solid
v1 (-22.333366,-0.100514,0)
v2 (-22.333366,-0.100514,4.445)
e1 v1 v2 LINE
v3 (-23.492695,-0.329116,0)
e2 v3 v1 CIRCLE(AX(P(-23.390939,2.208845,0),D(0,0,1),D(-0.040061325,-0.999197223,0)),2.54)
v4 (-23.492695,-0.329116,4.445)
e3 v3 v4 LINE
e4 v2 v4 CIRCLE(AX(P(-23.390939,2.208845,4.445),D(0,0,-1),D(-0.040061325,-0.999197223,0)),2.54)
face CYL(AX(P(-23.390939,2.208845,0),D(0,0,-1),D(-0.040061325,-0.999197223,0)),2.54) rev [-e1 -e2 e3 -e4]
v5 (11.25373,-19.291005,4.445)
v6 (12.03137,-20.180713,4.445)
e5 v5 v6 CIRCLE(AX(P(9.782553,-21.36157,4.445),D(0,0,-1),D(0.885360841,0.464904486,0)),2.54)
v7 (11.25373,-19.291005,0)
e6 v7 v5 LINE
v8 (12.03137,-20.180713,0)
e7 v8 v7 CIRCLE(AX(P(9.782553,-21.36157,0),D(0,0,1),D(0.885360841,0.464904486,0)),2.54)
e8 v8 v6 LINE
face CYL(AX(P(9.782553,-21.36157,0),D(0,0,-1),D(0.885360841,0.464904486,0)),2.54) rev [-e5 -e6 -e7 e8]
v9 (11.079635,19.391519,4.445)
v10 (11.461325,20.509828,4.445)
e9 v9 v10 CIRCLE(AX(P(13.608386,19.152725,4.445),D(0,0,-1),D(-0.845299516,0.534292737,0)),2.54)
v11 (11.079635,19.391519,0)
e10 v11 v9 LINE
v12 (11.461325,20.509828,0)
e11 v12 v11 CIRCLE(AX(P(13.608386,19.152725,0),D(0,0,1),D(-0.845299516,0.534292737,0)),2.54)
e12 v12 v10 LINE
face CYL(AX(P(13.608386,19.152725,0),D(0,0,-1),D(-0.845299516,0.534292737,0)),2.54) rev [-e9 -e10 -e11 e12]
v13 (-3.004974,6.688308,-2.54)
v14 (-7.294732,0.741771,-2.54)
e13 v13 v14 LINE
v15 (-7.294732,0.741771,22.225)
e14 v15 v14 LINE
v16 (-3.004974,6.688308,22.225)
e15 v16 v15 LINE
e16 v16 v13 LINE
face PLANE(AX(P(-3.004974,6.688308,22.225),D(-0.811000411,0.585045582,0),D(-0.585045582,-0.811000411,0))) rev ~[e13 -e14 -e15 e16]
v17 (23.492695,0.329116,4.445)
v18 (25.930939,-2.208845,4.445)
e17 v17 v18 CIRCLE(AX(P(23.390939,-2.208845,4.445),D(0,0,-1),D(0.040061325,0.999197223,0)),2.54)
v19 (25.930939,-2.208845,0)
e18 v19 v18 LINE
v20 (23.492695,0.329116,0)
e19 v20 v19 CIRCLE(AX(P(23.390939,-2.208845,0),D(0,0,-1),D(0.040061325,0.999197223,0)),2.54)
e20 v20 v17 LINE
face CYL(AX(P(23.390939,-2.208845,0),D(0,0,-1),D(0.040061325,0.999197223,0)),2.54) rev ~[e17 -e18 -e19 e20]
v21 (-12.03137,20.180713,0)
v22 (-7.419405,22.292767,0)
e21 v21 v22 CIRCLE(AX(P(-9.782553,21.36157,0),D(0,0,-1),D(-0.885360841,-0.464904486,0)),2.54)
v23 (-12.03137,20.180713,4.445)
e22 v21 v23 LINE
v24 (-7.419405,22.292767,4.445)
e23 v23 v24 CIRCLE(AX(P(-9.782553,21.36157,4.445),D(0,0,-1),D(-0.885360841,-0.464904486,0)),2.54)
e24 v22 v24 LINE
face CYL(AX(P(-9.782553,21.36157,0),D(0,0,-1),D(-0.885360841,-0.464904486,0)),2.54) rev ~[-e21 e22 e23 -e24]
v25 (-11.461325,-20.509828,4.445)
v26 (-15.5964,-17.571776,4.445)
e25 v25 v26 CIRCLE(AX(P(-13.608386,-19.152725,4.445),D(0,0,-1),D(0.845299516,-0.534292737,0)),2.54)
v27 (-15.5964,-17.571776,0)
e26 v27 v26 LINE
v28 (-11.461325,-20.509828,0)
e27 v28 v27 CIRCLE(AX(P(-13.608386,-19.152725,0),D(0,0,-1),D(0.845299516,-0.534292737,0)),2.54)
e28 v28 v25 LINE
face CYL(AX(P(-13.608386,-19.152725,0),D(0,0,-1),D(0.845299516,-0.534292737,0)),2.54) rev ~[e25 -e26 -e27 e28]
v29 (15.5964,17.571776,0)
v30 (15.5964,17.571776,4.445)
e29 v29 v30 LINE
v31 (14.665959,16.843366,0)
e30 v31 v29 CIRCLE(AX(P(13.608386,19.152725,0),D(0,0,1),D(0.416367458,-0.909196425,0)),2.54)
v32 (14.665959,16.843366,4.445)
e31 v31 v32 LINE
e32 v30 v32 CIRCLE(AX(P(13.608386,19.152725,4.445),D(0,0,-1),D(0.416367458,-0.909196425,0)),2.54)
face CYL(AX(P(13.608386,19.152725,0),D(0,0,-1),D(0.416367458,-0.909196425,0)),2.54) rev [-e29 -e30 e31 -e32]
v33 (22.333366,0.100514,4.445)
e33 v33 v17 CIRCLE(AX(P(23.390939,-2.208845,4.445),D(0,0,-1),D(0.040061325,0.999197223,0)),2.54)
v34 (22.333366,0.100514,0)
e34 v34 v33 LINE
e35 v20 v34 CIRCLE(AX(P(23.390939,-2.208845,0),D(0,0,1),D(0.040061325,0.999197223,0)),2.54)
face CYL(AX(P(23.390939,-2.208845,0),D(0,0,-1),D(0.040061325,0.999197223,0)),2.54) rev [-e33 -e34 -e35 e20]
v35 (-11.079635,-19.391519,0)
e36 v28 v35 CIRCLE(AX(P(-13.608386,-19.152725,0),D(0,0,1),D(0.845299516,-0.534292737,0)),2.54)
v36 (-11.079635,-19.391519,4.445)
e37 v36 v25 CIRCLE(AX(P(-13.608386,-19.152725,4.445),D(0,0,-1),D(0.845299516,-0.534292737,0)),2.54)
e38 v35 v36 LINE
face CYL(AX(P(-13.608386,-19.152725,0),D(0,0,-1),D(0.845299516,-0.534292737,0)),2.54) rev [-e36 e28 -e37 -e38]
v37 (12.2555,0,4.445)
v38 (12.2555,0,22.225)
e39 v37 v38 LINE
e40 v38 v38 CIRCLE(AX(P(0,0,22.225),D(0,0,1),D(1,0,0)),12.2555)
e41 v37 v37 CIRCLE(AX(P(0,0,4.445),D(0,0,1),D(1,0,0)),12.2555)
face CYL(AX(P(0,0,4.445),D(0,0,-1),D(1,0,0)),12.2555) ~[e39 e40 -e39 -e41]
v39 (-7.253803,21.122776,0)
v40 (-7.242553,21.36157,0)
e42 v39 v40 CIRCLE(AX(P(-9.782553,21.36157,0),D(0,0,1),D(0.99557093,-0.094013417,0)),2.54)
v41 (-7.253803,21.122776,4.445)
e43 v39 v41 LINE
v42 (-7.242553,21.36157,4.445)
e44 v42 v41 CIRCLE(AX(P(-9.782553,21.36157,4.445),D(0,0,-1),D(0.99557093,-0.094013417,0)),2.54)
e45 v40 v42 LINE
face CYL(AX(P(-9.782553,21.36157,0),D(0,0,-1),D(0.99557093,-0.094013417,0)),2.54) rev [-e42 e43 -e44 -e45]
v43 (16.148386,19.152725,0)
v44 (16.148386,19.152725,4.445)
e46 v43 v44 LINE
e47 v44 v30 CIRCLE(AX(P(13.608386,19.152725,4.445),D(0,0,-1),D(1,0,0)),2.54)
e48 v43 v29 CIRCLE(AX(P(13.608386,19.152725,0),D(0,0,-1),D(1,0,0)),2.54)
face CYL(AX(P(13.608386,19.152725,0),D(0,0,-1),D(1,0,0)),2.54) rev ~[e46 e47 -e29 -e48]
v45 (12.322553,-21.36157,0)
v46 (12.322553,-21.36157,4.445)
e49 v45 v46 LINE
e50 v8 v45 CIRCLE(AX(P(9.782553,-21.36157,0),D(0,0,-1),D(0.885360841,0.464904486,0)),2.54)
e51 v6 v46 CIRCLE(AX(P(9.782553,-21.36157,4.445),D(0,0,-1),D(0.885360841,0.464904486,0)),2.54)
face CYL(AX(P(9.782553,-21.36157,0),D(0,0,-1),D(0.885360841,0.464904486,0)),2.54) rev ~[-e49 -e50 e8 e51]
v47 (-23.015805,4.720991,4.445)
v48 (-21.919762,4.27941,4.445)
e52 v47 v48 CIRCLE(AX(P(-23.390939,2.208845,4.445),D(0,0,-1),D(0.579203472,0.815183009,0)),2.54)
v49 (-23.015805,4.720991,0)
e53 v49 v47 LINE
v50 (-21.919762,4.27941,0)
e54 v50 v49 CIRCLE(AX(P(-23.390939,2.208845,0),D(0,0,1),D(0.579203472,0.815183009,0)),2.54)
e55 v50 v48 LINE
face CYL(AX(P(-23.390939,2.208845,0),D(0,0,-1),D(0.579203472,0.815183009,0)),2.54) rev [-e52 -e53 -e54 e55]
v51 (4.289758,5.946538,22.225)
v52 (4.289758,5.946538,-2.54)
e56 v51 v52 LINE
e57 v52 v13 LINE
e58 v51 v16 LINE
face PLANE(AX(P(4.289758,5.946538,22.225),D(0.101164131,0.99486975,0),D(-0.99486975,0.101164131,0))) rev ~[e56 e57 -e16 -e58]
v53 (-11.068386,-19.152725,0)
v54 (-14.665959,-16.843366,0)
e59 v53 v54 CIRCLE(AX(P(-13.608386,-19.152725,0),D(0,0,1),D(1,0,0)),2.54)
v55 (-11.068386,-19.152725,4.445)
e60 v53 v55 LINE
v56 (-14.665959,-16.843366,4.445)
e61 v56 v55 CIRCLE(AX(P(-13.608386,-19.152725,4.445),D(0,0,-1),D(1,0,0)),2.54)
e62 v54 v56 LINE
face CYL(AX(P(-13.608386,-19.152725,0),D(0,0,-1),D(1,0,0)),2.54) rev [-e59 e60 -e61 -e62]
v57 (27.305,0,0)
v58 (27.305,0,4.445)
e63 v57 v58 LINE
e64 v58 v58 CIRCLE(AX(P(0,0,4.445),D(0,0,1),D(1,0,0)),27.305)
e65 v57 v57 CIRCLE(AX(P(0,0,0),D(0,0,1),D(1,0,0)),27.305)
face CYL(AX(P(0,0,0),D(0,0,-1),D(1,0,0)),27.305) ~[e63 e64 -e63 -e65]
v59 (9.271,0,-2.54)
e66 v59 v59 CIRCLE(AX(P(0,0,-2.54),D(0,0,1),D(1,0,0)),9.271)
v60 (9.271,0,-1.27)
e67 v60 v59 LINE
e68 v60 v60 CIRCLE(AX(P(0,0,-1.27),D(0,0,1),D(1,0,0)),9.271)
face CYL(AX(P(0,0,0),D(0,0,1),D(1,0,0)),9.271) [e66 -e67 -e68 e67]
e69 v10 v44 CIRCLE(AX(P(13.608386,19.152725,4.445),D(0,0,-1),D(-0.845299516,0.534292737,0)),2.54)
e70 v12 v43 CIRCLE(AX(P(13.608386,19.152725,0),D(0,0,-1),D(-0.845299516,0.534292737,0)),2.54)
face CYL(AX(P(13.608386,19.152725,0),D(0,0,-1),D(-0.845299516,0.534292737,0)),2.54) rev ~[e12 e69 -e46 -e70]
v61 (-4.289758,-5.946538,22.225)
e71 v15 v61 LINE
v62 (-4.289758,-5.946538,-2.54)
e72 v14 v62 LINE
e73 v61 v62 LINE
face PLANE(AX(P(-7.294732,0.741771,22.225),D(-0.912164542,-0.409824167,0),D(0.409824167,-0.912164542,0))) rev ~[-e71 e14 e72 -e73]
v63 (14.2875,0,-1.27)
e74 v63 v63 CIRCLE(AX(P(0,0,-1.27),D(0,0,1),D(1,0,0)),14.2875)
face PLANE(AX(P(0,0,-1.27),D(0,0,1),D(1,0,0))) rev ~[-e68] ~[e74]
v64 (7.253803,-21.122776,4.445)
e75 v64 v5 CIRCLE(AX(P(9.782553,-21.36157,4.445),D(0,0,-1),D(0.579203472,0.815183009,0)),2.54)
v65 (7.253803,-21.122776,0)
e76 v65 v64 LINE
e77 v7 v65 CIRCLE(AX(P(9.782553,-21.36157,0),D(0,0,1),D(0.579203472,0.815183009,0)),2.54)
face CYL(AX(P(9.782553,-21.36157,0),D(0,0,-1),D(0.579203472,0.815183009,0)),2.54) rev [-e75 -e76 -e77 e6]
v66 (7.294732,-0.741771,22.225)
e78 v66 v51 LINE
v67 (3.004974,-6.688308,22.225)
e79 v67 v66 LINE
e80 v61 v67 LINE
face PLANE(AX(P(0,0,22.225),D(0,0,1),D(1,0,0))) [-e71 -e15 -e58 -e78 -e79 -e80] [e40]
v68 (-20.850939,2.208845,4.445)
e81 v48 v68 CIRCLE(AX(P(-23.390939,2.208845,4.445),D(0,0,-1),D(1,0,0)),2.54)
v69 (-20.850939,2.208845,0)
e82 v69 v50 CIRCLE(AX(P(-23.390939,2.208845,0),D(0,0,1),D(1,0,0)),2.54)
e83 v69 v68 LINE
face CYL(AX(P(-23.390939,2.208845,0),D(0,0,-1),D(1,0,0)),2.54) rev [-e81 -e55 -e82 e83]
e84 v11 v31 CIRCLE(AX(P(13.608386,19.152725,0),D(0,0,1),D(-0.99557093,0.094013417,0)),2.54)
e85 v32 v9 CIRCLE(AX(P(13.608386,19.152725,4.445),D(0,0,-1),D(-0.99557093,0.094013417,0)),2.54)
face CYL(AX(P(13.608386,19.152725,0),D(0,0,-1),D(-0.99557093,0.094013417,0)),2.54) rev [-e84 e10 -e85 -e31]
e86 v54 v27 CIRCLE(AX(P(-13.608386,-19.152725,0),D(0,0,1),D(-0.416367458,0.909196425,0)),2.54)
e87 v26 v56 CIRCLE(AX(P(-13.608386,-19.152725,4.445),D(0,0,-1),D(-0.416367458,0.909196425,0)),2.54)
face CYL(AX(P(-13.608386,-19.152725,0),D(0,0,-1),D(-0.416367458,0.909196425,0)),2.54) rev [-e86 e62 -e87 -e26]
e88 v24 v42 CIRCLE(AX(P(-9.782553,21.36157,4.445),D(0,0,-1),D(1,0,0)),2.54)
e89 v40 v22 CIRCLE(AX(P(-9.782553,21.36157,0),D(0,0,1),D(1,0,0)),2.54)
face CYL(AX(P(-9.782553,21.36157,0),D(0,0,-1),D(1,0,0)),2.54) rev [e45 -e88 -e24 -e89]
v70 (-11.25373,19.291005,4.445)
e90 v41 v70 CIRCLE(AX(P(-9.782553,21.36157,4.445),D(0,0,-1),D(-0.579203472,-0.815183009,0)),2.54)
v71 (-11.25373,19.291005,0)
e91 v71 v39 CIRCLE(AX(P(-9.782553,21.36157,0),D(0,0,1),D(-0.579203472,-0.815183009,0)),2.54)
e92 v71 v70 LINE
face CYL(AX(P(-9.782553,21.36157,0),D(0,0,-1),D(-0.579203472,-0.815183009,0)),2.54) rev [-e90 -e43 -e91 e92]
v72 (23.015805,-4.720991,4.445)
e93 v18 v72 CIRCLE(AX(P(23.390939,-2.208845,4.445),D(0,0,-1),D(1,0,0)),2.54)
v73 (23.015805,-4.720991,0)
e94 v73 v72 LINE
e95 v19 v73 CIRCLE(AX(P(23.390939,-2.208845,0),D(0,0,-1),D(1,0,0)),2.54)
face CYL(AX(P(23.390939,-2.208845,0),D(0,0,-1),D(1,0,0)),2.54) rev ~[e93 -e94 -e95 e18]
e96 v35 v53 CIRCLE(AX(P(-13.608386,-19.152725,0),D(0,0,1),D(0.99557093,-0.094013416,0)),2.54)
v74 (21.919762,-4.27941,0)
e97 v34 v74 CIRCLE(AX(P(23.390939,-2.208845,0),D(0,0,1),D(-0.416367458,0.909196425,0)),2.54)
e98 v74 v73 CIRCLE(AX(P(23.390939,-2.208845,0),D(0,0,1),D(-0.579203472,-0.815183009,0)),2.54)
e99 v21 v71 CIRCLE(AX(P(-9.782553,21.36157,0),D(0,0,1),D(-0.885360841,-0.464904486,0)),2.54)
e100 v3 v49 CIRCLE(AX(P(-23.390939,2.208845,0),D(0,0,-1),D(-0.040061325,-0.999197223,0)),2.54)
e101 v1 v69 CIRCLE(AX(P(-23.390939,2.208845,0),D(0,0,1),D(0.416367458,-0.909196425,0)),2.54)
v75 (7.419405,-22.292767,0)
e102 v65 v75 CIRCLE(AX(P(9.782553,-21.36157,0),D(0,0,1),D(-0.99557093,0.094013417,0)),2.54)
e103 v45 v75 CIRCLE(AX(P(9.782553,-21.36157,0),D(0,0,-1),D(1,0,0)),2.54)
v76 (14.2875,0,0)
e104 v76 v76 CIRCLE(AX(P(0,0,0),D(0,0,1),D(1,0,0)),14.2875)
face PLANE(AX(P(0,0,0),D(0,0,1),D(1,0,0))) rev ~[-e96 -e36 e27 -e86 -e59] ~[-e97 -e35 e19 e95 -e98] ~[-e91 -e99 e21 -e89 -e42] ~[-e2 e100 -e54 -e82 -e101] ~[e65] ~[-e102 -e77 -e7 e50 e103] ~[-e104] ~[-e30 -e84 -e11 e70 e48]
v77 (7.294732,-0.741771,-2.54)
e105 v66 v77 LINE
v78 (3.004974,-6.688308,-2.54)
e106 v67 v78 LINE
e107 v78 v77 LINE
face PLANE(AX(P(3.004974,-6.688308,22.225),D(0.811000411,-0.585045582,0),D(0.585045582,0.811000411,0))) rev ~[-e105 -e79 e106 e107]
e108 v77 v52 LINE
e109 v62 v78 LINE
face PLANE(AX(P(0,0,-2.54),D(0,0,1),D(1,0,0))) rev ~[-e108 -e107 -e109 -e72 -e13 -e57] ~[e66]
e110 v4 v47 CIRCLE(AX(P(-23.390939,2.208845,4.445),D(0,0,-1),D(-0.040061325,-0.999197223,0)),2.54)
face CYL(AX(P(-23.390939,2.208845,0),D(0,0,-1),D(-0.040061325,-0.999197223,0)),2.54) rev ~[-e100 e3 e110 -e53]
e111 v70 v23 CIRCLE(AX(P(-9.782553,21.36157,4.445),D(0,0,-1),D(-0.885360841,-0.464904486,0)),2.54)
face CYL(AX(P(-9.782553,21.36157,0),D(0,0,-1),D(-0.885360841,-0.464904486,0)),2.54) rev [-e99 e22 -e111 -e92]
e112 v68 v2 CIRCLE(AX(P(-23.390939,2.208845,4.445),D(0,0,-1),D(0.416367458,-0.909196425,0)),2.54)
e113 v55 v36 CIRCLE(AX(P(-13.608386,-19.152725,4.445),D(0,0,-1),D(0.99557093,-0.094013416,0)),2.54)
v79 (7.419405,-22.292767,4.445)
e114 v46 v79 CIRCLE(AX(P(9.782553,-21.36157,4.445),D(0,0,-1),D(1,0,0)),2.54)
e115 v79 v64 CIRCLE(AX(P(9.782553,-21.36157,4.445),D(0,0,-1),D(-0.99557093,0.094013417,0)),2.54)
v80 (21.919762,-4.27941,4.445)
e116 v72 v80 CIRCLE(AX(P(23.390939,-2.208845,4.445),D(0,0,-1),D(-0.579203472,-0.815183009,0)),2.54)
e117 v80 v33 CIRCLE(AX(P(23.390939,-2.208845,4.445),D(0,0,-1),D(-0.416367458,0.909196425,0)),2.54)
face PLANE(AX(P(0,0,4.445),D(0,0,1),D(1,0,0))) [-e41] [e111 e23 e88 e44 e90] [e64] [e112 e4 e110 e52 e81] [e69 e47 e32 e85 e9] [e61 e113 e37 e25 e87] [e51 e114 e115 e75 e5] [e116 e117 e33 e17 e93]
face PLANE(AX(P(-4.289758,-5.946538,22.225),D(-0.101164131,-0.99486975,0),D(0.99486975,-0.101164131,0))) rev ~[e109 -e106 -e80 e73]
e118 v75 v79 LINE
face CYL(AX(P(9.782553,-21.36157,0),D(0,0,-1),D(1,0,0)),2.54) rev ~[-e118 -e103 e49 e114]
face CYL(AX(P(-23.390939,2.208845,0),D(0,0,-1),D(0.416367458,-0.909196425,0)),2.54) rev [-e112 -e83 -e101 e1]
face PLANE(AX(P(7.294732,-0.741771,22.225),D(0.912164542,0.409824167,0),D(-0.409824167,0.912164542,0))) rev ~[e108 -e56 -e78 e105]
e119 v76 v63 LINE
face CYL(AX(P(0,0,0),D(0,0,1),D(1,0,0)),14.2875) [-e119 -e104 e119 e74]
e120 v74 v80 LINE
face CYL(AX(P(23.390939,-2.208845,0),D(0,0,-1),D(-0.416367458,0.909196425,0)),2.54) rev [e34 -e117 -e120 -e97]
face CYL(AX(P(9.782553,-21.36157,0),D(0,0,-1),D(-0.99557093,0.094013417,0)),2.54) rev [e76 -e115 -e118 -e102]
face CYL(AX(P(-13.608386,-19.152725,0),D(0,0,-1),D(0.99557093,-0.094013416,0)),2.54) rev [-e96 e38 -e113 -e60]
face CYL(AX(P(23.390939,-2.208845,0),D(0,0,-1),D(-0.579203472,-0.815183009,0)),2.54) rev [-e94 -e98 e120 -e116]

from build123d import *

# Parameters (mm, degrees)
F0_R     = 27.305
F0_R_2   = 14.2875
F0_R_3   = 9.271
F1_DEPTH = 4.445
F2_R     = 12.2555
F3_DEPTH = 17.78
F4_DEPTH = 2.54
F5_DEPTH = 1.27
F7_DEPTH = 25.4
F8_DEPTH = 25.4


# Not quite as in the source:
# - a feature names something its author has since deleted; it is built from what else it names


with BuildPart() as f1:
    # F0 (on Top) → F1 (new body)
    with BuildSketch(Plane.XY):
        Circle(F0_R)
        with BuildLine():
            ThreePointArc((25.93093901, -2.2088452252), (25.0490643413, -4.1329607067), (23.015804848, -4.7209905953))
            ThreePointArc((23.015804848, -4.7209905953), (19.1527247884, -13.6083855831), (12.0313699631, -20.180712619))
            ThreePointArc((12.0313699631, -20.180712619), (12.2486833913, -20.753455716), (12.3225534269, -21.3615700137))
            ThreePointArc((12.3225534269, -21.3615700137), (10.2564743458, -23.856965566), (7.4194046374, -22.2927669845))
            ThreePointArc((7.4194046374, -22.2927669845), (-2.2088452252, -23.39093901), (-11.461324813, -20.5098283399))
            ThreePointArc((-11.461324813, -20.5098283399), (-15.0795624029, -21.2232896304), (-15.5964002105, -17.5717763892))
            ThreePointArc((-15.5964002105, -17.5717763892), (-21.3615700137, -9.7825534269), (-23.4926947761, -0.3291157209))
            ThreePointArc((-23.4926947761, -0.3291157209), (-25.9196891733, 2.4476393036), (-23.015804848, 4.7209905953))
            ThreePointArc((-23.015804848, 4.7209905953), (-19.1527247884, 13.6083855831), (-12.0313699631, 20.180712619))
            ThreePointArc((-12.0313699631, 20.180712619), (-10.8401267704, 23.6709289341), (-7.4194046374, 22.2927669845))
            ThreePointArc((-7.4194046374, 22.2927669845), (2.2088452252, 23.39093901), (11.461324813, 20.5098283399))
            ThreePointArc((11.461324813, 20.5098283399), (14.3148081351, 21.5925131354), (16.1483855831, 19.1527247884))
            ThreePointArc((16.1483855831, 19.1527247884), (16.0064219833, 18.3154545673), (15.5964002105, 17.5717763892))
            ThreePointArc((15.5964002105, 17.5717763892), (21.3615700137, 9.7825534269), (23.4926947761, 0.3291157209))
            ThreePointArc((23.4926947761, 0.3291157209), (25.2226130593, -0.4491378129), (25.93093901, -2.2088452252))
        make_face(mode=Mode.SUBTRACT)
        with BuildLine():
            ThreePointArc((21.9197621902, -4.2794100672), (20.8621888468, -1.9700511468), (22.3333656666, 0.1005136952))
            Line((22.3333656666, 0.1005136952), (14.6659589265, 16.843365868))
            ThreePointArc((14.6659589265, 16.843365868), (12.1372087633, 17.0821599464), (11.0796354198, 19.3915188668))
            Line((11.0796354198, 19.3915188668), (-7.2538032637, 21.1227759353))
            ThreePointArc((-7.2538032637, 21.1227759353), (-8.7249800835, 19.0522110933), (-11.2537302467, 19.2910051717))
            Line((-11.2537302467, 19.2910051717), (-21.9197621902, 4.2794100672))
            ThreePointArc((-21.9197621902, 4.2794100672), (-21.1339067637, 3.3739226642), (-20.85093901, 2.2088452252))
            ThreePointArc((-20.85093901, 2.2088452252), (-21.2534362273, 0.8367366822), (-22.3333656666, -0.1005136952))
            Line((-22.3333656666, -0.1005136952), (-14.6659589265, -16.843365868))
            ThreePointArc((-14.6659589265, -16.843365868), (-12.2362770401, -17.0152220057), (-11.0683855831, -19.1527247884))
            ThreePointArc((-11.0683855831, -19.1527247884), (-11.0711996011, -19.2722542521), (-11.0796354198, -19.3915188668))
            Line((-11.0796354198, -19.3915188668), (7.2538032637, -21.1227759353))
            ThreePointArc((7.2538032637, -21.1227759353), (8.7249800835, -19.0522110933), (11.2537302467, -19.2910051717))
            Line((11.2537302467, -19.2910051717), (21.9197621902, -4.2794100672))
        make_face()
        Circle(F0_R_2, mode=Mode.SUBTRACT)
        Circle(F0_R_2)
        Circle(F0_R_3, mode=Mode.SUBTRACT)
        Circle(F0_R_3)
        with BuildLine():
            Line((14.6659589265, 16.843365868), (22.3333656666, 0.1005136952))
            ThreePointArc((22.3333656666, 0.1005136952), (22.8995516558, 0.2831697162), (23.4926947761, 0.3291157209))
            ThreePointArc((23.4926947761, 0.3291157209), (21.3615700137, 9.7825534269), (15.5964002105, 17.5717763892))
            ThreePointArc((15.5964002105, 17.5717763892), (15.1741272585, 17.152711537), (14.6659589265, 16.843365868))
        make_face()
        with BuildLine():
            Line((-7.2538032637, 21.1227759353), (11.0796354198, 19.3915188668))
            ThreePointArc((11.0796354198, 19.3915188668), (11.2045436601, 19.9731783273), (11.461324813, 20.5098283399))
            ThreePointArc((11.461324813, 20.5098283399), (2.2088452252, 23.39093901), (-7.4194046374, 22.2927669845))
            ThreePointArc((-7.4194046374, 22.2927669845), (-7.2871578746, 21.8354909325), (-7.2425534269, 21.3615700137))
            ThreePointArc((-7.2425534269, 21.3615700137), (-7.2453674449, 21.24204055), (-7.2538032637, 21.1227759353))
        make_face()
        with BuildLine():
            Line((-21.9197621902, 4.2794100672), (-11.2537302467, 19.2910051717))
            ThreePointArc((-11.2537302467, 19.2910051717), (-11.6950079957, 19.6900086111), (-12.0313699631, 20.180712619))
            ThreePointArc((-12.0313699631, 20.180712619), (-19.1527247884, 13.6083855831), (-23.015804848, 4.7209905953))
            ThreePointArc((-23.015804848, 4.7209905953), (-22.441747564, 4.5648239176), (-21.9197621902, 4.2794100672))
        make_face()
        with BuildLine():
            ThreePointArc((-23.4926947761, -0.3291157209), (-21.3615700137, -9.7825534269), (-15.5964002105, -17.5717763892))
            ThreePointArc((-15.5964002105, -17.5717763892), (-15.1741272585, -17.152711537), (-14.6659589265, -16.843365868))
            Line((-14.6659589265, -16.843365868), (-22.3333656666, -0.1005136952))
            ThreePointArc((-22.3333656666, -0.1005136952), (-22.8995516558, -0.2831697162), (-23.4926947761, -0.3291157209))
        make_face()
        with BuildLine():
            ThreePointArc((7.4194046374, -22.2927669845), (7.2676203056, -21.7175354546), (7.2538032637, -21.1227759353))
            Line((7.2538032637, -21.1227759353), (-11.0796354198, -19.3915188668))
            ThreePointArc((-11.0796354198, -19.3915188668), (-11.2045436601, -19.9731783273), (-11.461324813, -20.5098283399))
            ThreePointArc((-11.461324813, -20.5098283399), (-2.2088452252, -23.39093901), (7.4194046374, -22.2927669845))
        make_face()
        with BuildLine():
            ThreePointArc((12.0313699631, -20.180712619), (19.1527247884, -13.6083855831), (23.015804848, -4.7209905953))
            ThreePointArc((23.015804848, -4.7209905953), (22.441747564, -4.5648239176), (21.9197621902, -4.2794100672))
            Line((21.9197621902, -4.2794100672), (11.2537302467, -19.2910051717))
            ThreePointArc((11.2537302467, -19.2910051717), (11.6950079957, -19.6900086111), (12.0313699631, -20.180712619))
        make_face()
        with BuildLine():
            ThreePointArc((-11.2537302467, 19.2910051717), (-8.7249800835, 19.0522110933), (-7.2538032637, 21.1227759353))
            Line((-7.2538032637, 21.1227759353), (-9.7825534269, 21.3615700137))
            Line((-9.7825534269, 21.3615700137), (-11.2537302467, 19.2910051717))
        make_face()
        with BuildLine():
            ThreePointArc((-20.85093901, 2.2088452252), (-21.1339067637, 3.3739226642), (-21.9197621902, 4.2794100672))
            Line((-21.9197621902, 4.2794100672), (-23.39093901, 2.2088452252))
            Line((-23.39093901, 2.2088452252), (-22.3333656666, -0.1005136952))
            ThreePointArc((-22.3333656666, -0.1005136952), (-21.2534362273, 0.8367366822), (-20.85093901, 2.2088452252))
        make_face()
        with BuildLine():
            Line((-13.6083855831, -19.1527247884), (-11.0796354198, -19.3915188668))
            ThreePointArc((-11.0796354198, -19.3915188668), (-11.0711996011, -19.2722542521), (-11.0683855831, -19.1527247884))
            ThreePointArc((-11.0683855831, -19.1527247884), (-12.2362770401, -17.0152220057), (-14.6659589265, -16.843365868))
            Line((-14.6659589265, -16.843365868), (-13.6083855831, -19.1527247884))
        make_face()
        with BuildLine():
            Line((9.7825534269, -21.3615700137), (11.2537302467, -19.2910051717))
            ThreePointArc((11.2537302467, -19.2910051717), (8.7249800835, -19.0522110933), (7.2538032637, -21.1227759353))
            Line((7.2538032637, -21.1227759353), (9.7825534269, -21.3615700137))
        make_face()
        with BuildLine():
            Line((21.9197621902, -4.2794100672), (23.39093901, -2.2088452252))
            Line((23.39093901, -2.2088452252), (22.3333656666, 0.1005136952))
            ThreePointArc((22.3333656666, 0.1005136952), (20.8621888468, -1.9700511468), (21.9197621902, -4.2794100672))
        make_face()
        with BuildLine():
            ThreePointArc((11.0796354198, 19.3915188668), (12.1372087633, 17.0821599464), (14.6659589265, 16.843365868))
            Line((14.6659589265, 16.843365868), (13.6083855831, 19.1527247884))
            Line((13.6083855831, 19.1527247884), (11.0796354198, 19.3915188668))
        make_face()
        with BuildLine():
            Line((13.6083855831, 19.1527247884), (14.6659589265, 16.843365868))
            ThreePointArc((14.6659589265, 16.843365868), (15.1741272585, 17.152711537), (15.5964002105, 17.5717763892))
            ThreePointArc((15.5964002105, 17.5717763892), (14.6237726929, 18.3891353039), (13.6083855831, 19.1527247884))
        make_face()
        with BuildLine():
            Line((11.0796354198, 19.3915188668), (13.6083855831, 19.1527247884))
            ThreePointArc((13.6083855831, 19.1527247884), (12.5532078509, 19.8603121237), (11.461324813, 20.5098283399))
            ThreePointArc((11.461324813, 20.5098283399), (11.2045436601, 19.9731783273), (11.0796354198, 19.3915188668))
        make_face()
        with BuildLine():
            Line((-9.7825534269, 21.3615700137), (-7.2538032637, 21.1227759353))
            ThreePointArc((-7.2538032637, 21.1227759353), (-7.2453674449, 21.24204055), (-7.2425534269, 21.3615700137))
            ThreePointArc((-7.2425534269, 21.3615700137), (-7.2871578746, 21.8354909325), (-7.4194046374, 22.2927669845))
            ThreePointArc((-7.4194046374, 22.2927669845), (-8.6135719804, 21.8591263032), (-9.7825534269, 21.3615700137))
        make_face()
        with BuildLine():
            Line((-11.2537302467, 19.2910051717), (-9.7825534269, 21.3615700137))
            ThreePointArc((-9.7825534269, 21.3615700137), (-10.9229309008, 20.8015529597), (-12.0313699631, 20.180712619))
            ThreePointArc((-12.0313699631, 20.180712619), (-11.6950079957, 19.6900086111), (-11.2537302467, 19.2910051717))
        make_face()
        with BuildLine():
            Line((-23.39093901, 2.2088452252), (-21.9197621902, 4.2794100672))
            ThreePointArc((-21.9197621902, 4.2794100672), (-22.441747564, 4.5648239176), (-23.015804848, 4.7209905953))
            ThreePointArc((-23.015804848, 4.7209905953), (-23.2373446733, 3.4699909992), (-23.39093901, 2.2088452252))
        make_face()
        with BuildLine():
            ThreePointArc((-23.39093901, 2.2088452252), (-23.4761387517, 0.941240836), (-23.4926947761, -0.3291157209))
            ThreePointArc((-23.4926947761, -0.3291157209), (-22.8995516558, -0.2831697162), (-22.3333656666, -0.1005136952))
            Line((-22.3333656666, -0.1005136952), (-23.39093901, 2.2088452252))
        make_face()
        with BuildLine():
            ThreePointArc((-15.5964002105, -17.5717763892), (-14.6237726929, -18.3891353039), (-13.6083855831, -19.1527247884))
            Line((-13.6083855831, -19.1527247884), (-14.6659589265, -16.843365868))
            ThreePointArc((-14.6659589265, -16.843365868), (-15.1741272585, -17.152711537), (-15.5964002105, -17.5717763892))
        make_face()
        with BuildLine():
            ThreePointArc((-11.461324813, -20.5098283399), (-11.2045436601, -19.9731783273), (-11.0796354198, -19.3915188668))
            Line((-11.0796354198, -19.3915188668), (-13.6083855831, -19.1527247884))
            ThreePointArc((-13.6083855831, -19.1527247884), (-12.5532078509, -19.8603121237), (-11.461324813, -20.5098283399))
        make_face()
        with BuildLine():
            ThreePointArc((7.4194046374, -22.2927669845), (8.6135719804, -21.8591263032), (9.7825534269, -21.3615700137))
            Line((9.7825534269, -21.3615700137), (7.2538032637, -21.1227759353))
            ThreePointArc((7.2538032637, -21.1227759353), (7.2676203056, -21.7175354546), (7.4194046374, -22.2927669845))
        make_face()
        with BuildLine():
            ThreePointArc((9.7825534269, -21.3615700137), (10.9229309008, -20.8015529597), (12.0313699631, -20.180712619))
            ThreePointArc((12.0313699631, -20.180712619), (11.6950079957, -19.6900086111), (11.2537302467, -19.2910051717))
            Line((11.2537302467, -19.2910051717), (9.7825534269, -21.3615700137))
        make_face()
        with BuildLine():
            ThreePointArc((23.015804848, -4.7209905953), (23.2373446733, -3.4699909992), (23.39093901, -2.2088452252))
            Line((23.39093901, -2.2088452252), (21.9197621902, -4.2794100672))
            ThreePointArc((21.9197621902, -4.2794100672), (22.441747564, -4.5648239176), (23.015804848, -4.7209905953))
        make_face()
        with BuildLine():
            Line((22.3333656666, 0.1005136952), (23.39093901, -2.2088452252))
            ThreePointArc((23.39093901, -2.2088452252), (23.4689703336, -1.1056475386), (23.495, 0))
            ThreePointArc((23.495, 0), (23.494423687, 0.164561897), (23.4926947761, 0.3291157209))
            ThreePointArc((23.4926947761, 0.3291157209), (22.8995516558, 0.2831697162), (22.3333656666, 0.1005136952))
        make_face()
    extrude(amount=F1_DEPTH)

    # F2 (on face) → F3 (join)
    with BuildSketch(Plane.XY.offset(4.445)):
        Circle(F2_R)
    extrude(amount=F3_DEPTH)

    # F0 (on Top) → F4 (join)
    with BuildSketch(Plane.XY):
        Circle(F0_R_3)
    extrude(amount=-F4_DEPTH)

    # F0 (on Top) → F5 (join)
    with BuildSketch(Plane.XY):
        Circle(F0_R_2)
        Circle(F0_R_3, mode=Mode.SUBTRACT)
    extrude(amount=-F5_DEPTH)

    # F6 (on face) → F7 (cut)
    with BuildSketch(Plane.XY.offset(22.225)):
        Polygon((-4.2897580502, -5.9465375811), (3.0049735847, -6.6883082382), (7.2947316349, -0.741770657), (4.2897580502, 5.9465375811), (-3.0049735847, 6.6883082382), (-7.2947316349, 0.741770657), align=None)
    extrude(amount=-F7_DEPTH, mode=Mode.SUBTRACT)

    # F0 (on Top) → F8 (cut)
    with BuildSketch(Plane.XY):
        with BuildLine():
            ThreePointArc((11.0796354198, 19.3915188668), (12.1372087633, 17.0821599464), (14.6659589265, 16.843365868))
            Line((14.6659589265, 16.843365868), (13.6083855831, 19.1527247884))
            Line((13.6083855831, 19.1527247884), (11.0796354198, 19.3915188668))
        make_face()
        with BuildLine():
            Line((13.6083855831, 19.1527247884), (14.6659589265, 16.843365868))
            ThreePointArc((14.6659589265, 16.843365868), (15.1741272585, 17.152711537), (15.5964002105, 17.5717763892))
            ThreePointArc((15.5964002105, 17.5717763892), (14.6237726929, 18.3891353039), (13.6083855831, 19.1527247884))
        make_face()
        with BuildLine():
            Line((11.0796354198, 19.3915188668), (13.6083855831, 19.1527247884))
            ThreePointArc((13.6083855831, 19.1527247884), (12.5532078509, 19.8603121237), (11.461324813, 20.5098283399))
            ThreePointArc((11.461324813, 20.5098283399), (11.2045436601, 19.9731783273), (11.0796354198, 19.3915188668))
        make_face()
        with BuildLine():
            Line((-23.39093901, 2.2088452252), (-21.9197621902, 4.2794100672))
            ThreePointArc((-21.9197621902, 4.2794100672), (-22.441747564, 4.5648239176), (-23.015804848, 4.7209905953))
            ThreePointArc((-23.015804848, 4.7209905953), (-23.2373446733, 3.4699909992), (-23.39093901, 2.2088452252))
        make_face()
        with BuildLine():
            ThreePointArc((-20.85093901, 2.2088452252), (-21.1339067637, 3.3739226642), (-21.9197621902, 4.2794100672))
            Line((-21.9197621902, 4.2794100672), (-23.39093901, 2.2088452252))
            Line((-23.39093901, 2.2088452252), (-22.3333656666, -0.1005136952))
            ThreePointArc((-22.3333656666, -0.1005136952), (-21.2534362273, 0.8367366822), (-20.85093901, 2.2088452252))
        make_face()
        with BuildLine():
            ThreePointArc((-23.39093901, 2.2088452252), (-23.4761387517, 0.941240836), (-23.4926947761, -0.3291157209))
            ThreePointArc((-23.4926947761, -0.3291157209), (-22.8995516558, -0.2831697162), (-22.3333656666, -0.1005136952))
            Line((-22.3333656666, -0.1005136952), (-23.39093901, 2.2088452252))
        make_face()
        with BuildLine():
            Line((-11.2537302467, 19.2910051717), (-9.7825534269, 21.3615700137))
            ThreePointArc((-9.7825534269, 21.3615700137), (-10.9229309008, 20.8015529597), (-12.0313699631, 20.180712619))
            ThreePointArc((-12.0313699631, 20.180712619), (-11.6950079957, 19.6900086111), (-11.2537302467, 19.2910051717))
        make_face()
        with BuildLine():
            ThreePointArc((-11.2537302467, 19.2910051717), (-8.7249800835, 19.0522110933), (-7.2538032637, 21.1227759353))
            Line((-7.2538032637, 21.1227759353), (-9.7825534269, 21.3615700137))
            Line((-9.7825534269, 21.3615700137), (-11.2537302467, 19.2910051717))
        make_face()
        with BuildLine():
            Line((-9.7825534269, 21.3615700137), (-7.2538032637, 21.1227759353))
            ThreePointArc((-7.2538032637, 21.1227759353), (-7.2453674449, 21.24204055), (-7.2425534269, 21.3615700137))
            ThreePointArc((-7.2425534269, 21.3615700137), (-7.2871578746, 21.8354909325), (-7.4194046374, 22.2927669845))
            ThreePointArc((-7.4194046374, 22.2927669845), (-8.6135719804, 21.8591263032), (-9.7825534269, 21.3615700137))
        make_face()
        with BuildLine():
            Line((-13.6083855831, -19.1527247884), (-11.0796354198, -19.3915188668))
            ThreePointArc((-11.0796354198, -19.3915188668), (-11.0711996011, -19.2722542521), (-11.0683855831, -19.1527247884))
            ThreePointArc((-11.0683855831, -19.1527247884), (-12.2362770401, -17.0152220057), (-14.6659589265, -16.843365868))
            Line((-14.6659589265, -16.843365868), (-13.6083855831, -19.1527247884))
        make_face()
        with BuildLine():
            ThreePointArc((-11.461324813, -20.5098283399), (-11.2045436601, -19.9731783273), (-11.0796354198, -19.3915188668))
            Line((-11.0796354198, -19.3915188668), (-13.6083855831, -19.1527247884))
            ThreePointArc((-13.6083855831, -19.1527247884), (-12.5532078509, -19.8603121237), (-11.461324813, -20.5098283399))
        make_face()
        with BuildLine():
            ThreePointArc((-15.5964002105, -17.5717763892), (-14.6237726929, -18.3891353039), (-13.6083855831, -19.1527247884))
            Line((-13.6083855831, -19.1527247884), (-14.6659589265, -16.843365868))
            ThreePointArc((-14.6659589265, -16.843365868), (-15.1741272585, -17.152711537), (-15.5964002105, -17.5717763892))
        make_face()
        with BuildLine():
            Line((9.7825534269, -21.3615700137), (11.2537302467, -19.2910051717))
            ThreePointArc((11.2537302467, -19.2910051717), (8.7249800835, -19.0522110933), (7.2538032637, -21.1227759353))
            Line((7.2538032637, -21.1227759353), (9.7825534269, -21.3615700137))
        make_face()
        with BuildLine():
            ThreePointArc((7.4194046374, -22.2927669845), (8.6135719804, -21.8591263032), (9.7825534269, -21.3615700137))
            Line((9.7825534269, -21.3615700137), (7.2538032637, -21.1227759353))
            ThreePointArc((7.2538032637, -21.1227759353), (7.2676203056, -21.7175354546), (7.4194046374, -22.2927669845))
        make_face()
        with BuildLine():
            ThreePointArc((9.7825534269, -21.3615700137), (10.9229309008, -20.8015529597), (12.0313699631, -20.180712619))
            ThreePointArc((12.0313699631, -20.180712619), (11.6950079957, -19.6900086111), (11.2537302467, -19.2910051717))
            Line((11.2537302467, -19.2910051717), (9.7825534269, -21.3615700137))
        make_face()
        with BuildLine():
            Line((21.9197621902, -4.2794100672), (23.39093901, -2.2088452252))
            Line((23.39093901, -2.2088452252), (22.3333656666, 0.1005136952))
            ThreePointArc((22.3333656666, 0.1005136952), (20.8621888468, -1.9700511468), (21.9197621902, -4.2794100672))
        make_face()
        with BuildLine():
            Line((22.3333656666, 0.1005136952), (23.39093901, -2.2088452252))
            ThreePointArc((23.39093901, -2.2088452252), (23.4689703336, -1.1056475386), (23.495, 0))
            ThreePointArc((23.495, 0), (23.494423687, 0.164561897), (23.4926947761, 0.3291157209))
            ThreePointArc((23.4926947761, 0.3291157209), (22.8995516558, 0.2831697162), (22.3333656666, 0.1005136952))
        make_face()
        with BuildLine():
            ThreePointArc((23.015804848, -4.7209905953), (23.2373446733, -3.4699909992), (23.39093901, -2.2088452252))
            Line((23.39093901, -2.2088452252), (21.9197621902, -4.2794100672))
            ThreePointArc((21.9197621902, -4.2794100672), (22.441747564, -4.5648239176), (23.015804848, -4.7209905953))
        make_face()
    extrude(amount=F8_DEPTH, mode=Mode.SUBTRACT)


solid = f1.part
